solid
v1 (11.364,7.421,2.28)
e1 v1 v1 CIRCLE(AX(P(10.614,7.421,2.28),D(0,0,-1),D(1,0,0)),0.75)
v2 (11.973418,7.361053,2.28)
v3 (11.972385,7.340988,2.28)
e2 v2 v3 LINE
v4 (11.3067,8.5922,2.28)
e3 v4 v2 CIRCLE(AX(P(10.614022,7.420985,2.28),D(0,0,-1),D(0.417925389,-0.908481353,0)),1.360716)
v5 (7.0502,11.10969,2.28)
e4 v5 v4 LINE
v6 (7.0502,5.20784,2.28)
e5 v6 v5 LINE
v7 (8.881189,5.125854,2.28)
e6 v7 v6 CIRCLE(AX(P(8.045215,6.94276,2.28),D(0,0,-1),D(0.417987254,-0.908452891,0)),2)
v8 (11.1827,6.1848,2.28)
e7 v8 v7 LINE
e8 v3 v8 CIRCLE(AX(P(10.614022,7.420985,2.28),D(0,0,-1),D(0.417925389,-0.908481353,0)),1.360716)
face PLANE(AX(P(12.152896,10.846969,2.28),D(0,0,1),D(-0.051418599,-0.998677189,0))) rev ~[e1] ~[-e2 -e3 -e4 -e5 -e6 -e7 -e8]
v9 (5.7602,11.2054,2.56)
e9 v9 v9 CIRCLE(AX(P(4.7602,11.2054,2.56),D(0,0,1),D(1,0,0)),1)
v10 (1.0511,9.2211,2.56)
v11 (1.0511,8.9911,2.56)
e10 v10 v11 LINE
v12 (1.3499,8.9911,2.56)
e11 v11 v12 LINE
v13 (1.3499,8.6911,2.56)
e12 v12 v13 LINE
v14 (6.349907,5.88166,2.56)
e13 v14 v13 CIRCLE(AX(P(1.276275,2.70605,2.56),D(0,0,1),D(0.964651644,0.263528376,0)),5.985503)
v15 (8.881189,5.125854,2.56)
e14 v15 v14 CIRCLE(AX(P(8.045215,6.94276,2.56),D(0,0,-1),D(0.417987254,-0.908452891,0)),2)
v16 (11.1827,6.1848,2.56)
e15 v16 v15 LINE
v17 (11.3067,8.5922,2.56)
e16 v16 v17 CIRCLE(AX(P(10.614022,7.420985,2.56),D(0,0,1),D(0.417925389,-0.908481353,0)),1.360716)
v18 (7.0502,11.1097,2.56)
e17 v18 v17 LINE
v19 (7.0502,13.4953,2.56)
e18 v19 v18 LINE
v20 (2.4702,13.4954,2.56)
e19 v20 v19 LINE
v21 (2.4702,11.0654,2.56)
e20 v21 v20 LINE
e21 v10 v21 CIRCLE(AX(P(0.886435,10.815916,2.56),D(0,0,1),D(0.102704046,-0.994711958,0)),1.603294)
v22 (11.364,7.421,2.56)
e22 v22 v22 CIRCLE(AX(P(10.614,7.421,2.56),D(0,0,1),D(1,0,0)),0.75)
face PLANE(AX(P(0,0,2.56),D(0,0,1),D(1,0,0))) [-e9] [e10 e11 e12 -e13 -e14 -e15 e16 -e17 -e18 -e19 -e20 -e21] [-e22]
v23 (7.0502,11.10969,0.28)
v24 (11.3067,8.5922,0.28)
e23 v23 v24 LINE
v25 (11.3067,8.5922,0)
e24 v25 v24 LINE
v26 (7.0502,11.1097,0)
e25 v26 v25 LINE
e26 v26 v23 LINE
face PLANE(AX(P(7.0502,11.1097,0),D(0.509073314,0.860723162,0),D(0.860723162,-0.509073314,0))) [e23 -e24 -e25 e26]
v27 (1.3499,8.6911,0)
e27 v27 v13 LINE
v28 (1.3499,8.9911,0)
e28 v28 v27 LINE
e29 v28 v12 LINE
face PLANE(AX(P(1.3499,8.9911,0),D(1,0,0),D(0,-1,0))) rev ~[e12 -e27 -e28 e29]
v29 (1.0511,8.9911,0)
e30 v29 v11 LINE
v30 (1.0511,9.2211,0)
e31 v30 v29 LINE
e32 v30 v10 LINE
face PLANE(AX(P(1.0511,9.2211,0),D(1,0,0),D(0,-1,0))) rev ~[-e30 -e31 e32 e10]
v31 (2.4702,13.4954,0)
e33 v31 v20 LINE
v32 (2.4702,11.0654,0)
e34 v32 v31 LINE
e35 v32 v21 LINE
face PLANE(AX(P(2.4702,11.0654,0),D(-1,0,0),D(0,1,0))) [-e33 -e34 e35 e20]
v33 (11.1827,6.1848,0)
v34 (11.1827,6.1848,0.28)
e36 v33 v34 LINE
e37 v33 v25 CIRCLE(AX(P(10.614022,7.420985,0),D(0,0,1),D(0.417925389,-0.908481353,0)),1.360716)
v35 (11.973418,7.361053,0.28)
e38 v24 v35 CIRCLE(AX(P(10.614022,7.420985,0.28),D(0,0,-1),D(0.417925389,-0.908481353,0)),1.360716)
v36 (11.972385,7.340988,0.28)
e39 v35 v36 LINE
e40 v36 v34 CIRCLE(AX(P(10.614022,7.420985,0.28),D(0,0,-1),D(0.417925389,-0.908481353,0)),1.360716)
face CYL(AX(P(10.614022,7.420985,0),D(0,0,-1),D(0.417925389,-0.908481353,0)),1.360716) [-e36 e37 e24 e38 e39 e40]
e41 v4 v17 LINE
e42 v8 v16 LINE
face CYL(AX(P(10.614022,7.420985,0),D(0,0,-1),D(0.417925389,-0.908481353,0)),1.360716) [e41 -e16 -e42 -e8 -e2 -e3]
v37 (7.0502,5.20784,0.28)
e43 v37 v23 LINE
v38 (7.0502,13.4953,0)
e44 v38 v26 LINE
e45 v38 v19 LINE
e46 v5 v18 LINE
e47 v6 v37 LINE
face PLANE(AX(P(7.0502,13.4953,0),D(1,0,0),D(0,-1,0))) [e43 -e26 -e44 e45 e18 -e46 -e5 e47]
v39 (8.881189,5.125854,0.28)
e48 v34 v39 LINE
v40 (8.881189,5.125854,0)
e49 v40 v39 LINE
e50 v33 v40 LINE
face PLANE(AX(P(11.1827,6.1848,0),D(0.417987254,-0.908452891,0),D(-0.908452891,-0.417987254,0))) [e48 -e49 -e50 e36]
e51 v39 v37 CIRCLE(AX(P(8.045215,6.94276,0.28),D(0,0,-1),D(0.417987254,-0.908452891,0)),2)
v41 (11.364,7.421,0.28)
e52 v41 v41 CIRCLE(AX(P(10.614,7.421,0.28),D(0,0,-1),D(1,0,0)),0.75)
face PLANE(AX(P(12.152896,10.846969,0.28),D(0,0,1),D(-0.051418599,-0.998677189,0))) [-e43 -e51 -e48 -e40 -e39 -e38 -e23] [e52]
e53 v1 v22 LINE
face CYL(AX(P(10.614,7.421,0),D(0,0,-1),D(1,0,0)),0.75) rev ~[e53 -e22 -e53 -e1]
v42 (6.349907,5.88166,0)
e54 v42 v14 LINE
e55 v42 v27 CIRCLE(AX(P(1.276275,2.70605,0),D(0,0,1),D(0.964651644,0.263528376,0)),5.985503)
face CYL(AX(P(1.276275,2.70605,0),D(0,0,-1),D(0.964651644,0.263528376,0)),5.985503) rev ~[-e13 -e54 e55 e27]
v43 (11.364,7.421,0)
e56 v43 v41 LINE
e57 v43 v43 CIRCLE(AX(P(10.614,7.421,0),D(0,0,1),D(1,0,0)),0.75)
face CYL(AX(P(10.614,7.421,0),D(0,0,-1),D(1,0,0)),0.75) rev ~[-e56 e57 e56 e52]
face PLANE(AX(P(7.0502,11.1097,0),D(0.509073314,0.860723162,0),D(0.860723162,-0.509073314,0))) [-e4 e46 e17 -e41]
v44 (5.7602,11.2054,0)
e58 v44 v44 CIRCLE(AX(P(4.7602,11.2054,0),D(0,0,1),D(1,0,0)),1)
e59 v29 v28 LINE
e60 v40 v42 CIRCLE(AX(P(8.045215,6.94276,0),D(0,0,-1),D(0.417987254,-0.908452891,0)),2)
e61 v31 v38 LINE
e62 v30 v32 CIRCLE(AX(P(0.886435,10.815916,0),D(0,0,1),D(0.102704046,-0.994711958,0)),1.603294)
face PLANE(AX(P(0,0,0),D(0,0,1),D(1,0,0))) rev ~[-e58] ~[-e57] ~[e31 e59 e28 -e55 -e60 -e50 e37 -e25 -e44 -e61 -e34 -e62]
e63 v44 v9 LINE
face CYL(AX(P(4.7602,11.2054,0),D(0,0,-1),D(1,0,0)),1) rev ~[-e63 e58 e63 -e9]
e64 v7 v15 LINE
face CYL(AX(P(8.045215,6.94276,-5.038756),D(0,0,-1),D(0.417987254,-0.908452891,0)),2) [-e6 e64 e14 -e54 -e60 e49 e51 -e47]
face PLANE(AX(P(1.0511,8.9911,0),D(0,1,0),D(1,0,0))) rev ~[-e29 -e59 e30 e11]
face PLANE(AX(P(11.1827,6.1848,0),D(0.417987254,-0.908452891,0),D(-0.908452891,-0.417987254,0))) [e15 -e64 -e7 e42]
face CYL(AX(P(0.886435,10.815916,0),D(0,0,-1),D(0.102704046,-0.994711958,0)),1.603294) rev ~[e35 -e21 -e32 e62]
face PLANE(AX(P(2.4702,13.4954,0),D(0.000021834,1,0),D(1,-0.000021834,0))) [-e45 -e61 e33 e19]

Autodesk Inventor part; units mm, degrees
ref_plane "YZ Plane" through (0, 0, 0) normal (1, 0, 0) x (0, 1, 0)
ref_plane "XZ Plane" through (0, 0, 0) normal (0, 1, 0) x (-1, 0, 0)
sketch "Sketch1" plane through (0, 0, 0) normal (0, 0, 1) x (1, 0, 0)
  line L0 (0, 0) -> (13.07, 0) construction
  line L1 (13.07, 0) -> (13.07, 20) construction
  line L2 (13.07, 20) -> (0, 20) construction
  line L3 (0, 20) -> (0, 0) construction
  line L4 (0.0102, 11.1339) -> (2.4902, 11.1339) construction
  line L5 (7.0502, 11.1097) -> (11.3067, 8.5922)
  arc A0 (11.1827, 6.1848) -> (11.3067, 8.5922) centre (10.614, 7.421) ccw
  line L6 (2.4702, 13.4954) -> (7.0502, 13.4953)
  line L7 (7.0502, 13.4953) -> (7.0502, 11.1097)
  line L8 (2.4702, 11.0654) -> (2.4702, 13.4954)
  circle A1 centre (4.7602, 11.2054) radius 1
  circle A2 centre (4.7602, 11.2054) radius 2.29 construction
  circle A3 centre (10.614, 7.421) radius 0.75
  line L9 (7.0502, 11.1097) -> (7.0502, 4.2834) construction
  line L10 (11.1827, 6.1848) -> (7.0502, 4.2834)
  arc A4 (1.0511, 9.2211) -> (2.4702, 11.0654) centre (0.8865, 10.8158) ccw
  line L11 (1.0511, 9.2211) -> (1.0511, 8.9911)
  line L12 (1.0511, 8.9911) -> (1.3499, 8.9911)
  line L13 (1.3499, 8.9911) -> (1.3499, 8.6911)
  arc A5 (7.0502, 4.2834) -> (1.3499, 8.6911) centre (1.2762, 2.706) ccw
  point P0 (0, 8.9921)
  point P1 (0, 7.8144)
  point P2 (0, 7.3623)
  dimension "d0" = 20
  dimension "d1" = 13.07
  dimension "d7" = 2
  dimension "d8" = 4.58
  dimension "d11" = 1.5
  dimension "d34" = 0.23
  dimension "d35" = 0.3
extrude "Extrusion2" add sketch "Sketch1" along normal blind 2.56
ref_plane "Work Plane3" through (11.9729, 7.351, 2.56) normal (0.9986772, -0.0514186, 0) x (0.0514186, 0.9986772, 0)
sketch "Sketch5" plane through (11.9729, 7.351, 2.56) normal (0.9986772, -0.0514186, 0) x (0.0514186, 0.9986772, 0)
  line L0 (3.5006, -2.56) -> (3.5006, 0) projected
  line L1 (3.5006, -1.28) -> (3.5006, -0.28)
  line L2 (3.5006, -0.28) -> (3.5006, -1.28)
  line L3 (3.5006, -1.28) -> (3.5006, -2.28)
  line L4 (3.5006, -0.28) -> (-3.2437, -0.28)
  line L5 (-3.2437, -0.28) -> (-3.2437, -2.28)
  line L6 (3.5006, -2.28) -> (-3.2437, -2.28)
  point P0 (-7.9569, -2.56)
  dimension "d29" = 1
  dimension "d30" = 1
extrude "Extrusion6" cut sketch "Sketch5" against normal up to surface surface through (7.0502, 11.1097, 0) normal (1, -0.000029, 0)
fillet "Fillet3" radius 2 1 edges at (7.0502, 4.2834, 1.28)
properties material "Liga de Nickel-Copper 400"
